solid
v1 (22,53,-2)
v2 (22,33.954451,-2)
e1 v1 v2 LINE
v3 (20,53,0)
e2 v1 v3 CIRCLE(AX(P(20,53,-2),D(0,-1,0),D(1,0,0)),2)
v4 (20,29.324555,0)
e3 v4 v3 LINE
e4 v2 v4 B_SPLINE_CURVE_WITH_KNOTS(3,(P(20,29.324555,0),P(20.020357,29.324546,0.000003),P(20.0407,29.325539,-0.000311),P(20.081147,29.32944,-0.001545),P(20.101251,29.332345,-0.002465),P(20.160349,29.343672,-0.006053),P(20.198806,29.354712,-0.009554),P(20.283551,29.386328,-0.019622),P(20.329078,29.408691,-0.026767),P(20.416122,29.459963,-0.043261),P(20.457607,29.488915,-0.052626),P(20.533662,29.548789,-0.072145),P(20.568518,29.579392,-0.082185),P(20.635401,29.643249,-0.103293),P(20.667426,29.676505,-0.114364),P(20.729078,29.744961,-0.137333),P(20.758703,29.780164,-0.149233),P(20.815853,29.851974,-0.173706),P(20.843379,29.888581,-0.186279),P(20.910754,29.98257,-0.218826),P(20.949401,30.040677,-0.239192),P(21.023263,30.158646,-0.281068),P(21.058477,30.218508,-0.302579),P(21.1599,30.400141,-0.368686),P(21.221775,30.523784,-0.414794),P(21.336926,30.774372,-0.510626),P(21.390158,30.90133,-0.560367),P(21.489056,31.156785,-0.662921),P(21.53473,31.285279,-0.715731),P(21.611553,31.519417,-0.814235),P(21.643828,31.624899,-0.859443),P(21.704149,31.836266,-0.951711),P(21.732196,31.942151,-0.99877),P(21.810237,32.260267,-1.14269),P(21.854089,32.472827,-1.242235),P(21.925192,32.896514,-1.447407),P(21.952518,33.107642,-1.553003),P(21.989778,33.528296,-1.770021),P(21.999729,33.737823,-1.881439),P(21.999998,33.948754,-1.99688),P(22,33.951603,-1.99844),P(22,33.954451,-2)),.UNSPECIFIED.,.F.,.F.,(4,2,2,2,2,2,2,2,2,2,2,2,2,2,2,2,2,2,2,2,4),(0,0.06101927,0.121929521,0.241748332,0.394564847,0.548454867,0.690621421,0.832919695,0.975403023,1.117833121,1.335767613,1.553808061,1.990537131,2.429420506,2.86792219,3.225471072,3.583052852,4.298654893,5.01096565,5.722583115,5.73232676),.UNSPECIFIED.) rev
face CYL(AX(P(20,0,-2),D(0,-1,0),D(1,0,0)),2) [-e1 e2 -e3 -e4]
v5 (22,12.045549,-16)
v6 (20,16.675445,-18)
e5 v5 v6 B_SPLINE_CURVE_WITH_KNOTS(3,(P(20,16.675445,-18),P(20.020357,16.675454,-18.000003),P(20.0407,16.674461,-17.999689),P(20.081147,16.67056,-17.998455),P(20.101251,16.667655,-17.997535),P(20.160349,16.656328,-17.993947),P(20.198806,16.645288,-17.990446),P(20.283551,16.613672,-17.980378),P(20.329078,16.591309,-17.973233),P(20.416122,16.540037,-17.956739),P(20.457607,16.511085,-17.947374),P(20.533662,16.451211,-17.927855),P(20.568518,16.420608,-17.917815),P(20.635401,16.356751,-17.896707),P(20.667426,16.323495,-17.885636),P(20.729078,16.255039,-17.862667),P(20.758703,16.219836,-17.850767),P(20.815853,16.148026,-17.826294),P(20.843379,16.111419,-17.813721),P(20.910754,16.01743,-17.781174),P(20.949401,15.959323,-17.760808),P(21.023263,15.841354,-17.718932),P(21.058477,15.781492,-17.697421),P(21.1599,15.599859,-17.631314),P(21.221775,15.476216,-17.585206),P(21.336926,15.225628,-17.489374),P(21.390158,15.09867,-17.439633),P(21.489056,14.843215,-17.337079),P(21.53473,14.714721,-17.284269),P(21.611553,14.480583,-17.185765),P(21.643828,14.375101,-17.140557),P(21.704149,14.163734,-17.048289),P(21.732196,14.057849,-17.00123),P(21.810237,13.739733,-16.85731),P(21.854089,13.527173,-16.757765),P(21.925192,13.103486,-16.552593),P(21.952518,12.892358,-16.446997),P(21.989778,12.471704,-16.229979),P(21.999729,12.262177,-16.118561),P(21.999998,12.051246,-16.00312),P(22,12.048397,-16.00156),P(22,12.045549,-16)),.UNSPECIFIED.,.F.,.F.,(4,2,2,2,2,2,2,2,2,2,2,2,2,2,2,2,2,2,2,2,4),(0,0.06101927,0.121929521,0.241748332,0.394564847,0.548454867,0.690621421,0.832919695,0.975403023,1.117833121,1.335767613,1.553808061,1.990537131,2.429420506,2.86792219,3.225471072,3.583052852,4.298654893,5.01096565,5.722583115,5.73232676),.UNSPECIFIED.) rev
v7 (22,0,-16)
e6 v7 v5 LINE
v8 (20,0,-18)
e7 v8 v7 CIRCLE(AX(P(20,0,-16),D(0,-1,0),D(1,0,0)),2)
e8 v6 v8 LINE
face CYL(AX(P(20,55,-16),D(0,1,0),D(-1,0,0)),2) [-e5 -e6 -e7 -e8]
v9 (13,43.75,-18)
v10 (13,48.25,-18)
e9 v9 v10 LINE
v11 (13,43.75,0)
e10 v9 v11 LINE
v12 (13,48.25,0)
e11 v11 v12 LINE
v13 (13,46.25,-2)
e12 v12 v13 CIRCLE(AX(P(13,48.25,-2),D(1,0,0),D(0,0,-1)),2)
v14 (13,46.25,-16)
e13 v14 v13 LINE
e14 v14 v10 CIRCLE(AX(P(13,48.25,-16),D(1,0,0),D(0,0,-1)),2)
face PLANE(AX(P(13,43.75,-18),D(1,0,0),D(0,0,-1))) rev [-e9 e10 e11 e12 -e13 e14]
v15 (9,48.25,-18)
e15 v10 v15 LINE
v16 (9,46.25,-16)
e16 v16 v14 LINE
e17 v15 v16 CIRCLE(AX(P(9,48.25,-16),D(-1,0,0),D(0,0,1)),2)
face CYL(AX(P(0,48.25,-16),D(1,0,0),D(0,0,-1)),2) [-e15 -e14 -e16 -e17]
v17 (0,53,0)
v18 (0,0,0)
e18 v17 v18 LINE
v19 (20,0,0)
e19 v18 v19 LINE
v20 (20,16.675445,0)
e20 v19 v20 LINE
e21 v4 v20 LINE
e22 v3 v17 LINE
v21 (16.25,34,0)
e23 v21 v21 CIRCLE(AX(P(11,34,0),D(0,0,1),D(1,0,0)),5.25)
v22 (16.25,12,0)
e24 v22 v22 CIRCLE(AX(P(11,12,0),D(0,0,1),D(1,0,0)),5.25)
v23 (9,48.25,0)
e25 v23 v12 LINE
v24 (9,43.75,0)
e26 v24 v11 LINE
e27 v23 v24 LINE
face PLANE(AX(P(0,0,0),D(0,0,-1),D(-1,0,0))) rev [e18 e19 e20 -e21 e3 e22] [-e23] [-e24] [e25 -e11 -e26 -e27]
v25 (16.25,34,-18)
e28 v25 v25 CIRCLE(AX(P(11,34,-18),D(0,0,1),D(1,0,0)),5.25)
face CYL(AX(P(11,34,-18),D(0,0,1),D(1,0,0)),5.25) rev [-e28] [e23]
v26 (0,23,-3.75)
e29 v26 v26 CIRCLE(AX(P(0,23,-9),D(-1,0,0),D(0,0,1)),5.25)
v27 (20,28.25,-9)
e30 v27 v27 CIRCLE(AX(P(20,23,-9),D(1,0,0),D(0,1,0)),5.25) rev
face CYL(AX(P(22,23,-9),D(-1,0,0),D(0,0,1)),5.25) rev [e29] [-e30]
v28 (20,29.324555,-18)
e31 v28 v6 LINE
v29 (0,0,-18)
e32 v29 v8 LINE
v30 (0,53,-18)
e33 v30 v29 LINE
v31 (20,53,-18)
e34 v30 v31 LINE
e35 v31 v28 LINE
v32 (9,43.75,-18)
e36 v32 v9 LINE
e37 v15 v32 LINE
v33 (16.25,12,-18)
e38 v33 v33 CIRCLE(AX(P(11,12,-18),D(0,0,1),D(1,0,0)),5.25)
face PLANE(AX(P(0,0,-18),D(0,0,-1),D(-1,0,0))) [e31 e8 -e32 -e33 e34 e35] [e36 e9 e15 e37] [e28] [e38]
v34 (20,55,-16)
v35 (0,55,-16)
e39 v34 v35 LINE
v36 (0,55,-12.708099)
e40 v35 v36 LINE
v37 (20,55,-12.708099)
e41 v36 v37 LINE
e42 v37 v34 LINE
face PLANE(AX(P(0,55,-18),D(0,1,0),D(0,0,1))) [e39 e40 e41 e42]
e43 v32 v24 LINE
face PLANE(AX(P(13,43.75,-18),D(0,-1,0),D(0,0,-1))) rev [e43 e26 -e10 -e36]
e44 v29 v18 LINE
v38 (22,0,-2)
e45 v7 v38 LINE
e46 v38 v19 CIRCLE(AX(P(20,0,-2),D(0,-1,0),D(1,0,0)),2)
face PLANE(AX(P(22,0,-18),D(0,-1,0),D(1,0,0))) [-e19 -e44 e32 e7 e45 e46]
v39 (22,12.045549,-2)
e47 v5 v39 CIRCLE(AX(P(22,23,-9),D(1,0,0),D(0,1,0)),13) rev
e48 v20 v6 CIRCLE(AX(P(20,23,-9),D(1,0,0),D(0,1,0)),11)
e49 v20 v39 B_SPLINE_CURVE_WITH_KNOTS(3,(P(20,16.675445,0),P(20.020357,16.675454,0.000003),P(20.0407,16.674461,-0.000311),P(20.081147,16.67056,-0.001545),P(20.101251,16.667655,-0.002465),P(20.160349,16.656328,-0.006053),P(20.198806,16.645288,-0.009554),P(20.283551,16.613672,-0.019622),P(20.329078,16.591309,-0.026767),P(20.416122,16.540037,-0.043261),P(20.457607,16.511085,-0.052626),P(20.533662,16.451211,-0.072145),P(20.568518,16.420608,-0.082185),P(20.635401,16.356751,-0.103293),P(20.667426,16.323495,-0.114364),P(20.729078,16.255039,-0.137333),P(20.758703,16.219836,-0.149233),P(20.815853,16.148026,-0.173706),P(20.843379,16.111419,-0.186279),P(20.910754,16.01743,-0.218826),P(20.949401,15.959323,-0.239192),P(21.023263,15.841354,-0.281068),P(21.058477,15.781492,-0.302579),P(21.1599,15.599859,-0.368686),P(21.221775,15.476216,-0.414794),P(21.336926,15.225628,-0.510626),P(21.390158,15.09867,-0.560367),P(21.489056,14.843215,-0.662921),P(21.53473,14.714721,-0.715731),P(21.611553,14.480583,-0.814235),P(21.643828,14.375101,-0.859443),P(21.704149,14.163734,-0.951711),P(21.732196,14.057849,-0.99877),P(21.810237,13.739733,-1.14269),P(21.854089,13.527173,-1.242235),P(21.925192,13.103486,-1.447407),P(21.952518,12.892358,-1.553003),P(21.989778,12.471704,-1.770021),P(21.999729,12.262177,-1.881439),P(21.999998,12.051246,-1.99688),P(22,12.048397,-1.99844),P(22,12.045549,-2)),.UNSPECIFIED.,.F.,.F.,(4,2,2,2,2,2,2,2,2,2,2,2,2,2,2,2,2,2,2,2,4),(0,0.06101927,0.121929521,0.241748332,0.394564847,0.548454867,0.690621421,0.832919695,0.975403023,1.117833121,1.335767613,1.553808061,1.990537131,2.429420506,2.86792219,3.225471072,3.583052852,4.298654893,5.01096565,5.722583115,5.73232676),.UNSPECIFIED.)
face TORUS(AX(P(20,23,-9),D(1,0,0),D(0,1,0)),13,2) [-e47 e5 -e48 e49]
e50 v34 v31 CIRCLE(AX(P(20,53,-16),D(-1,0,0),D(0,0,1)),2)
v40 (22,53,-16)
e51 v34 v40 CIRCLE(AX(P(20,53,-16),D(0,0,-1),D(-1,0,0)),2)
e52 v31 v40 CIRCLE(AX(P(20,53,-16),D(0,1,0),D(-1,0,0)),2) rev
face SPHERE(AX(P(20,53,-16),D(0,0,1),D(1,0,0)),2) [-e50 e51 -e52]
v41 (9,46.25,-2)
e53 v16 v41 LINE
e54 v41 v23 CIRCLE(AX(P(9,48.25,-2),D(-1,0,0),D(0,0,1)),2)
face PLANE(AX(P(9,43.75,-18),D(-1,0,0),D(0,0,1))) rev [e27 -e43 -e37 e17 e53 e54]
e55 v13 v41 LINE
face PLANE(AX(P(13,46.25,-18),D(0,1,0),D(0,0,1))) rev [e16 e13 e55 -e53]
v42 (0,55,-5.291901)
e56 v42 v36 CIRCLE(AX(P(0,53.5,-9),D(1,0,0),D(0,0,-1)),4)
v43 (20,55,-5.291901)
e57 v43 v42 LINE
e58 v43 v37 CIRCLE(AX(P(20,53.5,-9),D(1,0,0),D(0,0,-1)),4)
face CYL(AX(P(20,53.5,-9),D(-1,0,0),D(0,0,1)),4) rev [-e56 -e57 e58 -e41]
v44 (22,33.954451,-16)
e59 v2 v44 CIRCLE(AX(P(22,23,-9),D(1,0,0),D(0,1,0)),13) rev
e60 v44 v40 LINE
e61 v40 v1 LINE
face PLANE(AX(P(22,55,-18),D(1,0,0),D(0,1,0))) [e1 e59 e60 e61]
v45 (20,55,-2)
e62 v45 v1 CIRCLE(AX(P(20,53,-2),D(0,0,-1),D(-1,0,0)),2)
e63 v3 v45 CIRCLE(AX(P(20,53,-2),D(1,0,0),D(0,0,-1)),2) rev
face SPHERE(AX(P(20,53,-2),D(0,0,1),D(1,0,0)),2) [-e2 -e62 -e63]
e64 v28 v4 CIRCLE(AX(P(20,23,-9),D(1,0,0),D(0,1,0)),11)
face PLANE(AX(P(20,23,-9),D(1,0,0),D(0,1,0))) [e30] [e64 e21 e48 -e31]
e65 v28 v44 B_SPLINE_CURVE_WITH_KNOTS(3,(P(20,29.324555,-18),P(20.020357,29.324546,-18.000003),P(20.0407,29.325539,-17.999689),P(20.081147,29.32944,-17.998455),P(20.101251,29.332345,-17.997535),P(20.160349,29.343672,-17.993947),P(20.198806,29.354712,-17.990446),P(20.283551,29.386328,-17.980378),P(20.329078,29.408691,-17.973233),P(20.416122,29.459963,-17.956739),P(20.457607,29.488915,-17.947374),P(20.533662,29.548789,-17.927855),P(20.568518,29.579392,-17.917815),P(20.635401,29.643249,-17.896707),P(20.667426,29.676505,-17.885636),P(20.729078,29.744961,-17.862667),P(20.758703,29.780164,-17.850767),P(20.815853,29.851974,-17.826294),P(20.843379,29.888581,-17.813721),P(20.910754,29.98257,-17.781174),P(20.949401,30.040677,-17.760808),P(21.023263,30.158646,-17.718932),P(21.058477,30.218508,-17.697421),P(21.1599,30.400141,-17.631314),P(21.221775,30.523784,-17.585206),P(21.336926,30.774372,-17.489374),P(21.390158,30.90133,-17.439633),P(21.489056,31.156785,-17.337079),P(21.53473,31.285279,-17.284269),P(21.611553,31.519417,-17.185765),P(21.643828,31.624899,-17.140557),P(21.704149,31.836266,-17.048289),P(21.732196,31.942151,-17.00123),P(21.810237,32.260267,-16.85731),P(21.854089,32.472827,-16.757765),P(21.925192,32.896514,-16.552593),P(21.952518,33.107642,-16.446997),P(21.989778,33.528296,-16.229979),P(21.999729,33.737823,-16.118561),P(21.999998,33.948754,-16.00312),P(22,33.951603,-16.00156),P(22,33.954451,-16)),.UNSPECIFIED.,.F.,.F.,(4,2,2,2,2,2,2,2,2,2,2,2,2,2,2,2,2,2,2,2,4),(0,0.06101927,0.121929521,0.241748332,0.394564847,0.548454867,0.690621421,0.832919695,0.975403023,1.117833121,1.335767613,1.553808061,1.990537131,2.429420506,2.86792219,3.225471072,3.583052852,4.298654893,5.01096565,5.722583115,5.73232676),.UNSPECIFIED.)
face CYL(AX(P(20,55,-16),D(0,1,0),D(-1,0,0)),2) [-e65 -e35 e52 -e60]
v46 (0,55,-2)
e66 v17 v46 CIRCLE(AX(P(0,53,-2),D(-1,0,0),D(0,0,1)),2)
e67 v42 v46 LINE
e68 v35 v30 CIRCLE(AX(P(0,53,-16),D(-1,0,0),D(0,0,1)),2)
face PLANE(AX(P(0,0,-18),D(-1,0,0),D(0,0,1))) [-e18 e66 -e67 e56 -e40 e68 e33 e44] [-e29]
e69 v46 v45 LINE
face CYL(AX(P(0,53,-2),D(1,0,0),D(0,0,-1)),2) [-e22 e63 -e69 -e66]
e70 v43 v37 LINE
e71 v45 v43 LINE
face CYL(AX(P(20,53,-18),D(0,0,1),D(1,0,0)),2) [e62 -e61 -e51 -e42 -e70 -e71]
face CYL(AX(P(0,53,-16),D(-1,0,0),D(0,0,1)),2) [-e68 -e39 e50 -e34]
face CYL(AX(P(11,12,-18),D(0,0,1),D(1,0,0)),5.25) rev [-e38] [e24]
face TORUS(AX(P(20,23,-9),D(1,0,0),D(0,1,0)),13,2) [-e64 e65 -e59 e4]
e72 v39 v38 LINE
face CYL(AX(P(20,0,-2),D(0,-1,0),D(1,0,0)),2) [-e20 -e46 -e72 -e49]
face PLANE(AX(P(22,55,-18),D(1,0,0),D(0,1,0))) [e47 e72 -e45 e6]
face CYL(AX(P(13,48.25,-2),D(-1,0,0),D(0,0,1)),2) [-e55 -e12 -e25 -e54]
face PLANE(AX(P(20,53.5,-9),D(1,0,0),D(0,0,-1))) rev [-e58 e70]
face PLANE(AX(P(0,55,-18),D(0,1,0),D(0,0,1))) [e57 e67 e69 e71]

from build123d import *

# Parameters (mm, degrees)
SKETCH1_W           = 22
SKETCH1_H           = 55
SKETCH1_R           = 5.25
SKETCH1_W_2         = 4
SKETCH1_H_2         = 2.5
BOSS_EXTRUDE1_DEPTH = 18
SKETCH2_R           = 5.25
CUT_EXTRUDE1_DEPTH  = 62.911226769
SKETCH3_R           = 4
CUT_EXTRUDE2_DEPTH  = 20
SKETCH4_R           = 11
CUT_EXTRUDE3_DEPTH  = 2
FILLET3_R           = 2
FILLET2_R           = 2
FILLET4_R           = 2


# Some blends are built 0.0001 mm under size
with BuildPart() as part:
    # Sketch1 → Boss-Extrude1 (new body)
    with BuildSketch(Plane.XY):
        with Locations((11, 27.5)):
            Rectangle(SKETCH1_W, SKETCH1_H)
        with Locations((11, 12)):
            Circle(SKETCH1_R, mode=Mode.SUBTRACT)
        with Locations((11, 34)):
            Circle(SKETCH1_R, mode=Mode.SUBTRACT)
        with Locations((11, 45)):
            Rectangle(SKETCH1_W_2, SKETCH1_H_2, mode=Mode.SUBTRACT)
    extrude(amount=-BOSS_EXTRUDE1_DEPTH)

    # Sketch2 → Cut-Extrude1 (cut, through all)
    with BuildSketch(Plane.ZY):
        with Locations((-9, 23)):
            Circle(SKETCH2_R)
    extrude(amount=-CUT_EXTRUDE1_DEPTH, mode=Mode.SUBTRACT)

    # Sketch3 → Cut-Extrude2 (cut)
    with BuildSketch(Plane(origin=(0, 0, 0), x_dir=(0, 0, -1), z_dir=(1, 0, 0))):
        with Locations((9, 53.5)):
            Circle(SKETCH3_R)
    extrude(amount=CUT_EXTRUDE2_DEPTH, mode=Mode.SUBTRACT)

    # Sketch4 → Cut-Extrude3 (cut)
    with BuildSketch(Plane(origin=(22, 0, 0), x_dir=(0, 0, -1), z_dir=(1, 0, 0))):
        with Locations((9, 23)):
            Circle(SKETCH4_R)
    extrude(amount=-CUT_EXTRUDE3_DEPTH, mode=Mode.SUBTRACT)

    # Fillet3
    fillet3_edges = [part.edges().sort_by_distance(p)[0] for p in [
        (22, 12, -9),
        (22, 34, -9),
        (22, 8.33772234, -18),
        (22, 8.33772234, 0),
        (22, 42.16227766, -18),
        (22, 42.16227766, 0),
        (11, 55, -18),
        (11, 55, 0),
    ]]
    fillet(fillet3_edges, radius=FILLET3_R - 0.0001)  # a hair under: the kernel refuses the full size

    # Fillet2
    fillet2_edges = [part.edges().sort_by_distance(p)[0] for p in [
        (11, 46.25, -18),
        (11, 46.25, 0),
    ]]
    fillet(fillet2_edges, radius=FILLET2_R)

    # Fillet4
    # the kernel refuses this fillet: 2 mm, written as the material it takes off along each edge
    with BuildSketch(Plane(origin=(20, 53, -18), x_dir=(0, 1, 0), z_dir=(-1, 0, 0))) as fillet4_piece_1:
        with BuildLine():
            CenterArc((0.0001, -1.9999), 1.9999, 0, 90)
            Line((2, -1.9999), (2, 0))
            Line((2, 0), (0.0001, 0))
        make_face()
    revolve(axis=Axis((20, 53, -18), (0, 0, -1)), revolution_arc=90, mode=Mode.SUBTRACT)
    with BuildSketch(Plane(origin=(20, 53, 0), x_dir=(1, 0, 0), z_dir=(0, -1, 0))) as fillet4_piece_2:
        with BuildLine():
            CenterArc((0.0001, -1.9999), 1.9999, 0, 90)
            Line((2, -1.9999), (2, 0))
            Line((2, 0), (0.0001, 0))
        make_face()
    revolve(axis=Axis((20, 53, 0), (0, 0, 1)), revolution_arc=90, mode=Mode.SUBTRACT)
    with BuildSketch(Plane(origin=(22, 55, 0), x_dir=(0, -1, 0), z_dir=(0, 0, -1))) as fillet4_piece_3:
        with BuildLine():
            CenterArc((FILLET4_R, FILLET4_R), FILLET4_R, 180, 90)
            Line((0, FILLET4_R), (0, 0))
            Line((0, 0), (FILLET4_R, 0))
        make_face()
    extrude(amount=18, mode=Mode.SUBTRACT)


solid = part.part
